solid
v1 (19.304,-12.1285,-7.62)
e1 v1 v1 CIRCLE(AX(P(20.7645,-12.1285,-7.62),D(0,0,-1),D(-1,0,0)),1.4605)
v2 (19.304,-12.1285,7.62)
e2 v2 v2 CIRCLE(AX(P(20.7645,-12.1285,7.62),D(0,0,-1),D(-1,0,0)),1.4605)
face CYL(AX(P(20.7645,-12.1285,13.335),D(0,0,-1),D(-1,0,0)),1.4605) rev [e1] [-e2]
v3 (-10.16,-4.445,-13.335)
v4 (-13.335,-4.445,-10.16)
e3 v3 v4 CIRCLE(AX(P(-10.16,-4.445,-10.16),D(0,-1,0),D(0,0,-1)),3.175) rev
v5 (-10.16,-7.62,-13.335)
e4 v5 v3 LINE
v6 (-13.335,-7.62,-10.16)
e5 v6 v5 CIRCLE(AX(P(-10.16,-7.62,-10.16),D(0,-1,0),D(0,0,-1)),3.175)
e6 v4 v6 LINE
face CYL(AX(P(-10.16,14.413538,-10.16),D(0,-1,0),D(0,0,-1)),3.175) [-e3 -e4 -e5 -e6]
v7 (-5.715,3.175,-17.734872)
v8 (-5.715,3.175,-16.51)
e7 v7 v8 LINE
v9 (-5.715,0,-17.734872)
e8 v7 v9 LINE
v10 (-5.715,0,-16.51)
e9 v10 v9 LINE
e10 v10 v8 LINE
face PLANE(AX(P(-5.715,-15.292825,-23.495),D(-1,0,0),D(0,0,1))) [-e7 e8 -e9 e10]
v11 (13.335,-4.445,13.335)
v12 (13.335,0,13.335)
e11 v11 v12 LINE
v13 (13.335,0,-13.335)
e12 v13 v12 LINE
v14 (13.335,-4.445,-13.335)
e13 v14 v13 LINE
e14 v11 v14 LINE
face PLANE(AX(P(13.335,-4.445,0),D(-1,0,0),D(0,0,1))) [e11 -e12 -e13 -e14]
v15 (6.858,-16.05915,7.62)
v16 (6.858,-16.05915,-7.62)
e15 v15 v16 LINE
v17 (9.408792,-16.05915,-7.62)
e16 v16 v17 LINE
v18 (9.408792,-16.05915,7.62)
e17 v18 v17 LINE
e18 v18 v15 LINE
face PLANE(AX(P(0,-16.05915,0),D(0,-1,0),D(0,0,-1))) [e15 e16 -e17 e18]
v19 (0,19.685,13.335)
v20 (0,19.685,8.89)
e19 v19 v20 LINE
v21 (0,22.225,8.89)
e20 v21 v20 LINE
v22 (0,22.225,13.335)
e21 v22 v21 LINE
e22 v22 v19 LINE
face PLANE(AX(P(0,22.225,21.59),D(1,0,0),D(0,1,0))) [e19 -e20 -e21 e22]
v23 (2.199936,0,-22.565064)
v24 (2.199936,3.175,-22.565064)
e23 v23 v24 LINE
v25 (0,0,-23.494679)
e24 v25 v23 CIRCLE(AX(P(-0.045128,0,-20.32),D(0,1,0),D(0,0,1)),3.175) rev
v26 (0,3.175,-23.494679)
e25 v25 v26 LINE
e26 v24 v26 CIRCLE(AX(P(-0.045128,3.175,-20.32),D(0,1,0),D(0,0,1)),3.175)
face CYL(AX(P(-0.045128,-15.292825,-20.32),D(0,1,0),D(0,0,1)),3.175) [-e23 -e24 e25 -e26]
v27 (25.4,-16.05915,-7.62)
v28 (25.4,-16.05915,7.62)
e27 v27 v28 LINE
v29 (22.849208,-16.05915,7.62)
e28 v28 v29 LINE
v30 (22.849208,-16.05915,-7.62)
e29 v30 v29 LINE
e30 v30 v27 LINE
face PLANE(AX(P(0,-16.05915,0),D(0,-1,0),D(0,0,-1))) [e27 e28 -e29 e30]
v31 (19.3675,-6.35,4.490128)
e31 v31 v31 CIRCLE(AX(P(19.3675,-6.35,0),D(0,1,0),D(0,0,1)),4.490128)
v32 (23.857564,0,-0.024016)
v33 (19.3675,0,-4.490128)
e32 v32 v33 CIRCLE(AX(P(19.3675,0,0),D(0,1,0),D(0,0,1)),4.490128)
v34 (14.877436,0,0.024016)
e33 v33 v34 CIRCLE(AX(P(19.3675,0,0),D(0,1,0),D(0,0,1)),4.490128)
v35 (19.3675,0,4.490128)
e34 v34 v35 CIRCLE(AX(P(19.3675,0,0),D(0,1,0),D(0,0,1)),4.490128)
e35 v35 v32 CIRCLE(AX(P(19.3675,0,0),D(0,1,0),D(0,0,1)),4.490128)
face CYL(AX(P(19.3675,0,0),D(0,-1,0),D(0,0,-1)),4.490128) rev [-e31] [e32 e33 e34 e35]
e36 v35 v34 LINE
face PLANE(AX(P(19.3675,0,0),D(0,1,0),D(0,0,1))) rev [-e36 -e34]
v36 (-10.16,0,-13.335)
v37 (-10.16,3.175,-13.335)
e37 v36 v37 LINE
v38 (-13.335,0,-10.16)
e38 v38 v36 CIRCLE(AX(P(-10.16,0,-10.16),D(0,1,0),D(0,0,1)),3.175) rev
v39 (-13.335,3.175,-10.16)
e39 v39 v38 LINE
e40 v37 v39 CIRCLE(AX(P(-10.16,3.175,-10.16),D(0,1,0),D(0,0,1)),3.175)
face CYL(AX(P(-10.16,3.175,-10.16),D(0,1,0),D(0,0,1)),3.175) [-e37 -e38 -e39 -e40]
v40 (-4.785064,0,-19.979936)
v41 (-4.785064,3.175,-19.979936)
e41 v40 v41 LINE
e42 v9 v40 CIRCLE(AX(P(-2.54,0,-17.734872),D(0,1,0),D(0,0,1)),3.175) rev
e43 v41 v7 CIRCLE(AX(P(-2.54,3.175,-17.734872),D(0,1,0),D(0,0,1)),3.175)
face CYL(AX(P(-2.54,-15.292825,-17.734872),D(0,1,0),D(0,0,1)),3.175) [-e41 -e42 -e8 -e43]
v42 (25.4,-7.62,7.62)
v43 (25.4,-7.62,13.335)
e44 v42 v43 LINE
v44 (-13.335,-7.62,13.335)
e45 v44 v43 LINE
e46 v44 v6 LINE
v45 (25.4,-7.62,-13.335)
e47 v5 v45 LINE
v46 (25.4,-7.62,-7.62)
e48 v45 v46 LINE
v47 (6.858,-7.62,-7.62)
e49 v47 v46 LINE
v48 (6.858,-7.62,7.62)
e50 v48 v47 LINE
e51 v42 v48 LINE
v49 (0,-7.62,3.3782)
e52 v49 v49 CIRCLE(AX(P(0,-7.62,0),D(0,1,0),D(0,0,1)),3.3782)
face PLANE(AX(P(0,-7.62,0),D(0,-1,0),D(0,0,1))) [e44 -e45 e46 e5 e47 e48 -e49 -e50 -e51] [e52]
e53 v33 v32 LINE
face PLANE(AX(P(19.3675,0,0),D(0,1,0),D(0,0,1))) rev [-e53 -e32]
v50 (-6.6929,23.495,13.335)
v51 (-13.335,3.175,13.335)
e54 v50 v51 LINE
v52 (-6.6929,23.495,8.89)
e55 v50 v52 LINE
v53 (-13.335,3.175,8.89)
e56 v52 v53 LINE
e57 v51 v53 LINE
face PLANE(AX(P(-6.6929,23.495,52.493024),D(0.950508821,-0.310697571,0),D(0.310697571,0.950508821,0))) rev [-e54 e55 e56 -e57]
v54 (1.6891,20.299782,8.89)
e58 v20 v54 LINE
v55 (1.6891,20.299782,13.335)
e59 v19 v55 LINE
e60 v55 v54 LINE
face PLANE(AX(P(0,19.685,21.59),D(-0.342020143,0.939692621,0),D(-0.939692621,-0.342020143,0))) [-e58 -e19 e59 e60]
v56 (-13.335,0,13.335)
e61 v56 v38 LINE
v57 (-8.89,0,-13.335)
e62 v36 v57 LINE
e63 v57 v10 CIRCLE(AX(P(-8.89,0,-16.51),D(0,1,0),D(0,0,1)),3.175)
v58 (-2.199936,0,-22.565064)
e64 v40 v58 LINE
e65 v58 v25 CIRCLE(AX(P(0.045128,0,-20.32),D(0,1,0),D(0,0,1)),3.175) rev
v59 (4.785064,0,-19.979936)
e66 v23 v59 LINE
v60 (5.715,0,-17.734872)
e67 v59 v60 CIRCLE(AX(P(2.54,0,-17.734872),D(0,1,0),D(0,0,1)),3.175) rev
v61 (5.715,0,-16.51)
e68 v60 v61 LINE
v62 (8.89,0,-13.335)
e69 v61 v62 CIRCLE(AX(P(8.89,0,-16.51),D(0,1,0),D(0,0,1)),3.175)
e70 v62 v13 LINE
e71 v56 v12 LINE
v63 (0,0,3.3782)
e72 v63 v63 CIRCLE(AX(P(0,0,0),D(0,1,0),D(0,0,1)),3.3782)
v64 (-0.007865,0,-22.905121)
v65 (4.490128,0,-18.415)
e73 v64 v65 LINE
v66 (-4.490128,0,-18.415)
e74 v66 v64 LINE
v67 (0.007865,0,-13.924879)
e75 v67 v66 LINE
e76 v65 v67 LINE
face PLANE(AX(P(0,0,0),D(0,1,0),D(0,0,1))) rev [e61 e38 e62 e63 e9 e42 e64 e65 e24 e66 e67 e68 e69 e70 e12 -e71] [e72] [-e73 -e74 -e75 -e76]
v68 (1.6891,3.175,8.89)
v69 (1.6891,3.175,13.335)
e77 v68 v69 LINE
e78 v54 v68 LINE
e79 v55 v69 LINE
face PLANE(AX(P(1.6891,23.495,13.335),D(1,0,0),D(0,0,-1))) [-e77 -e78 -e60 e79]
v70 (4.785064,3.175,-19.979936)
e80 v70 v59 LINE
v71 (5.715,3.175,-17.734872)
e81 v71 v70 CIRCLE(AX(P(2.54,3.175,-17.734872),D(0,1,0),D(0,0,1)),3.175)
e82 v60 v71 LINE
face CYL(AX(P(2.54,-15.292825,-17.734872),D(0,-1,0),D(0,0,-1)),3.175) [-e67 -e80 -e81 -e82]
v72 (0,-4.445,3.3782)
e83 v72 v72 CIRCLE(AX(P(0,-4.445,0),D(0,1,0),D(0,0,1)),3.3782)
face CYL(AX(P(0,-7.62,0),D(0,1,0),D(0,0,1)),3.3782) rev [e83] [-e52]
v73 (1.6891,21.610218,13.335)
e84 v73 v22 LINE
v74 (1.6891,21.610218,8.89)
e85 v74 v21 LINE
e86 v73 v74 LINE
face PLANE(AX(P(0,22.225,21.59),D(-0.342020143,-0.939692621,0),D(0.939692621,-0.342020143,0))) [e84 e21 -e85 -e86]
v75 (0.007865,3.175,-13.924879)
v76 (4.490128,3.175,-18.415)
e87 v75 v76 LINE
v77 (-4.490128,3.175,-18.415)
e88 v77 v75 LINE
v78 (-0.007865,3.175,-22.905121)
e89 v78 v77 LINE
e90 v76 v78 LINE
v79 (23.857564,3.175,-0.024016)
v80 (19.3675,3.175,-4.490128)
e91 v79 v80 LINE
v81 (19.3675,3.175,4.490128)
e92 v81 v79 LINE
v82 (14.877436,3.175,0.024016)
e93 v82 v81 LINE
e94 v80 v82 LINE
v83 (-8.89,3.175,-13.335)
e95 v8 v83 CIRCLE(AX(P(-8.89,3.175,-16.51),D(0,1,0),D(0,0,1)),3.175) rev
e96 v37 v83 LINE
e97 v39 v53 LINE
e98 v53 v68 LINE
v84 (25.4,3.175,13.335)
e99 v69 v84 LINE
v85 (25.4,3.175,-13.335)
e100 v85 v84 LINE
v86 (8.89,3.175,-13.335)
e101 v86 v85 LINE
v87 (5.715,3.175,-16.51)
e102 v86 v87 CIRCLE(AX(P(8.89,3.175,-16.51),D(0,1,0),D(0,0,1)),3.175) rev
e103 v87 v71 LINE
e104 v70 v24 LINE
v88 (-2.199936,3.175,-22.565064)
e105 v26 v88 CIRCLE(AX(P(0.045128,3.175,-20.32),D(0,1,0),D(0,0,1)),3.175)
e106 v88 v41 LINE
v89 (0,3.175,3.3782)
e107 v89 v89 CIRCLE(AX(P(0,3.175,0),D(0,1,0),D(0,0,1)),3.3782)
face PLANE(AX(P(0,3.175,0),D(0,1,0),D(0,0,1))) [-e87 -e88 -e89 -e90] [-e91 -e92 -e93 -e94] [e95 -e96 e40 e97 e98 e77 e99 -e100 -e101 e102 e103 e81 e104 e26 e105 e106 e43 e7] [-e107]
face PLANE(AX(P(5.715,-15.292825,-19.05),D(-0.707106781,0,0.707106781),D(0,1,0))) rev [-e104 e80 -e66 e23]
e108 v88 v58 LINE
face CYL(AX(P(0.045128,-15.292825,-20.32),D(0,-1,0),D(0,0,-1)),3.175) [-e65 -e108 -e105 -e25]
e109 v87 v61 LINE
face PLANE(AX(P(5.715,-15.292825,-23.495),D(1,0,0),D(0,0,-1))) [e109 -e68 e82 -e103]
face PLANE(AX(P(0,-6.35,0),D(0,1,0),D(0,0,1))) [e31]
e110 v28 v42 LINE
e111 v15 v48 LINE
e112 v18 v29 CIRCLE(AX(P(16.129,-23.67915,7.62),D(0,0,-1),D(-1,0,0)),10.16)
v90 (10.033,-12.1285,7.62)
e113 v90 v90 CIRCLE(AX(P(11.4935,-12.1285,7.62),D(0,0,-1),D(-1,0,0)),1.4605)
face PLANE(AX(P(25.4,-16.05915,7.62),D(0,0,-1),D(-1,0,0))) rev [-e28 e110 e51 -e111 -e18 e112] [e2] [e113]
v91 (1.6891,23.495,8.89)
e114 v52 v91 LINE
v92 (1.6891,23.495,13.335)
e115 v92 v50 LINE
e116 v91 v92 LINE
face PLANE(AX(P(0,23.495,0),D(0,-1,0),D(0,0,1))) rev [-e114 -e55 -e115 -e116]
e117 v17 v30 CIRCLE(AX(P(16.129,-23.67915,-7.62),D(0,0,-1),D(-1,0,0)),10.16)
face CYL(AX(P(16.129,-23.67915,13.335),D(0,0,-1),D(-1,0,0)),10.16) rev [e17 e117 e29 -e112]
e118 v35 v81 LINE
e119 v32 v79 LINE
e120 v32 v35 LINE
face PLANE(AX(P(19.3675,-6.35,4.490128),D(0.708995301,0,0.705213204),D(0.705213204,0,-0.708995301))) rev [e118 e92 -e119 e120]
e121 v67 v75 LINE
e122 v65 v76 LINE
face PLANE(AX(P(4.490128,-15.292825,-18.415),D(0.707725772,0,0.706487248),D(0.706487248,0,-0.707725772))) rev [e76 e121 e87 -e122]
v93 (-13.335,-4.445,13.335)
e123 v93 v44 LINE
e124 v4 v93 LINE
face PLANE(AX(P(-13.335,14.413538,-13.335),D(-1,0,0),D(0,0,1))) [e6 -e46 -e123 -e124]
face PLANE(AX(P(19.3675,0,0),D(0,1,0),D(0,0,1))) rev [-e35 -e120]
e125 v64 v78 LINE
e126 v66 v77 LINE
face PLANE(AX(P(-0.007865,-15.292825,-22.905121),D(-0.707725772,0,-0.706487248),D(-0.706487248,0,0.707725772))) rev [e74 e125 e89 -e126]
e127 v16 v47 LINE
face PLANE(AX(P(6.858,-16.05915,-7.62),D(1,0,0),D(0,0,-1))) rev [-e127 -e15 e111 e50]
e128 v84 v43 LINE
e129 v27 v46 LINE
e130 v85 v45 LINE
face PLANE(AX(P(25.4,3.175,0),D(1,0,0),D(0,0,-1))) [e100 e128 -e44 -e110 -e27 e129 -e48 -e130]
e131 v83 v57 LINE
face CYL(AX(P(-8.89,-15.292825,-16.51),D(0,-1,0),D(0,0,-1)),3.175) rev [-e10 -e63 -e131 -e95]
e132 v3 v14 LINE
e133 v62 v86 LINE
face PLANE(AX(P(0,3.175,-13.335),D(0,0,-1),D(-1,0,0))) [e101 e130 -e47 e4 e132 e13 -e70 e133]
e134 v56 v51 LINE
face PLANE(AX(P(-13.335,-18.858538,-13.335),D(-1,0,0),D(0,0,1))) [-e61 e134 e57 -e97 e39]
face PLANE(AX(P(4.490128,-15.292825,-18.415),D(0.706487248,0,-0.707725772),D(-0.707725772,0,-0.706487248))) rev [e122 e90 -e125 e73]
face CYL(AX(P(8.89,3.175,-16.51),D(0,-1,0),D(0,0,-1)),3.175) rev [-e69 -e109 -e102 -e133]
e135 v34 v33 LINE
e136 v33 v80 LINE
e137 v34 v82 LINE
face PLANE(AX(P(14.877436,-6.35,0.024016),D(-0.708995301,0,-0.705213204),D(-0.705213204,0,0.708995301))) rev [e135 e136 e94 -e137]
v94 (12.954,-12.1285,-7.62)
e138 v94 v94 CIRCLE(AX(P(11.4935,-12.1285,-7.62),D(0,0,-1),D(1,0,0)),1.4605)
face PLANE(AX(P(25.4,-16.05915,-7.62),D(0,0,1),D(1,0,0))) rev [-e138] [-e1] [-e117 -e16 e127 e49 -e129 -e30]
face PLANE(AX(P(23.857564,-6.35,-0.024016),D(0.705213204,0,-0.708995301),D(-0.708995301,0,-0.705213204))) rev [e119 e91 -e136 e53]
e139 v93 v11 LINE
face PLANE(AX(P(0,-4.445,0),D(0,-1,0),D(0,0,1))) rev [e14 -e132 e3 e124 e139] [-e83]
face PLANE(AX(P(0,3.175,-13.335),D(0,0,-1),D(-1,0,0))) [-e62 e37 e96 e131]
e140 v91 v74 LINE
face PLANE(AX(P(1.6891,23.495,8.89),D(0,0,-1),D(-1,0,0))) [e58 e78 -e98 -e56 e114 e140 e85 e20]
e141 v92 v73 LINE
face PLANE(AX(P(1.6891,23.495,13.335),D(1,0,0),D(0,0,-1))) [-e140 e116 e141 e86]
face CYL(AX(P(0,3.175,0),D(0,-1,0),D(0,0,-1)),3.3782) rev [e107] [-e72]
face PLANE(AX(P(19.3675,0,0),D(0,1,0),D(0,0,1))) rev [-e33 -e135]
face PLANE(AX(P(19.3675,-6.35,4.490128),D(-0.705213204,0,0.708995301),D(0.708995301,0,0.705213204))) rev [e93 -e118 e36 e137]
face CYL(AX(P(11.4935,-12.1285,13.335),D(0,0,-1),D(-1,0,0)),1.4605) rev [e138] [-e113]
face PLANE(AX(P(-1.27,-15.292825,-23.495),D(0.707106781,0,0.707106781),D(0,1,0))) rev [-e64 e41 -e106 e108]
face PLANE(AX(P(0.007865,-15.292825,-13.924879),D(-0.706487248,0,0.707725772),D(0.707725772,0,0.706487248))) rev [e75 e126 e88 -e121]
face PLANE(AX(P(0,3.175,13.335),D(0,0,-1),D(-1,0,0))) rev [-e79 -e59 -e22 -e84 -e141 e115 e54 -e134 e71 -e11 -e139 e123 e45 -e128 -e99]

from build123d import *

# Parameters (mm, degrees)
SKETCH1_R            = 3.3782
BOSS_EXTRUDE1_DEPTH  = 3.175
BOSS_EXTRUDE2_DEPTH  = 4.445
SKETCH7_W            = 18.542
SKETCH7_H            = 15.24
BOSS_EXTRUDE4_DEPTH  = 8.43915
SKETCH8_R            = 1.4605
CUT_EXTRUDE3_DEPTH   = 37.635615509
SKETCH9_R            = 10.16
CUT_EXTRUDE4_DEPTH   = 37.635615509
CUT_EXTRUDE6_DEPTH   = 9.525
SKETCH23_R           = 4.490128061
CUT_EXTRUDE7_DEPTH   = 6.35
BOSS_EXTRUDE10_DEPTH = 3.175
BOSS_EXTRUDE11_DEPTH = 3.175
SKETCH19_W           = 8.382
SKETCH19_H           = 4.445
BOSS_EXTRUDE12_DEPTH = 20.32
BOSS_EXTRUDE13_DEPTH = 4.445
CUT_EXTRUDE5_DEPTH   = 12.7
SKETCH24_W           = 48.736365122
SKETCH24_H           = 10.862134757
CUT_EXTRUDE8_DEPTH   = 30.48
SKETCH26_W           = 11.43
SKETCH26_H           = 10.16
BOSS_EXTRUDE15_DEPTH = 3.175
CHAMFER1_SIZE        = 4.445
FILLET1_R            = 3.175


with BuildPart() as part:
    # Sketch1 → Boss-Extrude1 (new body)
    with BuildSketch(Plane(origin=(0, 0, 0), x_dir=(1, 0, 0), z_dir=(0, 1, 0))):
        with BuildLine():
            Line((0, -13.335), (25.4, -13.335))
            Line((25.4, -13.335), (25.4, 13.335))
            Line((25.4, 13.335), (0, 13.335))
            ThreePointArc((0, 13.335), (-13.335, 0), (0, -13.335))
        make_face()
        with Locations(Location((0, 0, 0), (0, 0, 270))):
            Circle(SKETCH1_R, mode=Mode.SUBTRACT)
    boss_extrude1 = extrude(amount=BOSS_EXTRUDE1_DEPTH)

    # Sketch2 → Boss-Extrude2 (add)
    with BuildSketch(Plane(origin=(0, 0, 0), x_dir=(-1, 0, 0), z_dir=(0, -1, 0))):
        Polygon((-25.4, 13.335), (-25.4, -13.335), (-13.335, -13.335), (-13.335, 0), (-13.335, 13.335), align=None)
    extrude(amount=BOSS_EXTRUDE2_DEPTH)

    # Mirror2: Boss-Extrude1 across plane
    add(boss_extrude1.mirror(Plane(origin=(0, -2.2225, 0), x_dir=(0, 0, 1), z_dir=(0, -1, 0))))

    # Sketch7 → Boss-Extrude4 (add)
    with BuildSketch(Plane(origin=(0, -7.62, 0), x_dir=(-1, 0, 0), z_dir=(0, -1, 0))):
        with Locations((-16.129, 0)):
            Rectangle(SKETCH7_W, SKETCH7_H)
    extrude(amount=BOSS_EXTRUDE4_DEPTH)

    # Sketch8 → Cut-Extrude3 (cut, through all)
    with BuildSketch(Plane(origin=(0, 0, -7.62), x_dir=(-1, 0, 0), z_dir=(0, 0, -1))):
        with Locations((-20.7645, -12.1285)):
            Circle(SKETCH8_R)
        with Locations((-11.4935, -12.1285)):
            Circle(SKETCH8_R)
    extrude(amount=-CUT_EXTRUDE3_DEPTH, mode=Mode.SUBTRACT)

    # Sketch9 → Cut-Extrude4 (cut, through all)
    with BuildSketch(Plane(origin=(0, 0, -7.62), x_dir=(-1, 0, 0), z_dir=(0, 0, -1))):
        with Locations((-16.129, -23.67915)):
            Circle(SKETCH9_R)
    extrude(amount=-CUT_EXTRUDE4_DEPTH, mode=Mode.SUBTRACT)

    # Sketch22 → Cut-Extrude6 (cut)
    with BuildSketch(Plane(origin=(0, 3.175, 0), x_dir=(1, 0, 0), z_dir=(0, 1, 0))):
        Polygon((19.3675, -4.490128061), (23.857563833, 0.024016226), (19.3675, 4.490128061), (14.877436167, -0.024016226), align=None)
    extrude(amount=-CUT_EXTRUDE6_DEPTH, mode=Mode.SUBTRACT)

    # Sketch23 → Cut-Extrude7 (cut)
    with BuildSketch(Plane(origin=(0, -6.35, 0), x_dir=(1, 0, 0), z_dir=(0, 1, 0))):
        with Locations(Location((19.3675, 0, 0), (0, 0, 270))):
            Circle(SKETCH23_R)
    extrude(amount=CUT_EXTRUDE7_DEPTH, mode=Mode.SUBTRACT)

    # Sketch16 → Boss-Extrude10 (add)
    with BuildSketch(Plane(origin=(0, 3.175, 0), x_dir=(1, 0, 0), z_dir=(0, 1, 0))):
        Polygon((0, 13.335), (-13.335, 0), (-13.335, 13.335), align=None)
    boss_extrude10 = extrude(amount=-BOSS_EXTRUDE10_DEPTH)

    # Sketch17 → Boss-Extrude11 (add)
    with BuildSketch(Plane.XZ.offset(7.62)):
        Polygon((-13.335, -13.335), (-13.335, 0), (0, -13.335), align=None)
    boss_extrude11 = extrude(amount=-BOSS_EXTRUDE11_DEPTH)

    # Sketch19 → Boss-Extrude12 (add)
    with BuildSketch(Plane(origin=(0, 3.175, 0), x_dir=(1, 0, 0), z_dir=(0, 1, 0))):
        with Locations((-2.5019, 11.1125)):
            Rectangle(SKETCH19_W, SKETCH19_H)
    boss_extrude12 = extrude(amount=BOSS_EXTRUDE12_DEPTH)

    # Sketch20 → Boss-Extrude13 (add)
    with BuildSketch(Plane.XY.offset(-8.89)):
        Polygon((-6.6929, 23.495), (-13.335, 3.175), (-6.6929, 3.175), align=None)
    boss_extrude13 = extrude(amount=-BOSS_EXTRUDE13_DEPTH)

    # Sketch21 → Cut-Extrude5 (cut)
    with BuildSketch(Plane.XY.offset(-8.89)):
        Polygon((0, 22.225), (1.6891, 21.610217877), (1.6891, 20.299782123), (0, 19.685), align=None)
    cut_extrude5 = extrude(amount=-CUT_EXTRUDE5_DEPTH, mode=Mode.SUBTRACT)

    # Mirror3: Boss-Extrude10, Boss-Extrude11, Boss-Extrude12, Boss-Extrude13, Cut-Extrude5 across plane
    add(boss_extrude10.mirror(Plane.XY))
    add(boss_extrude11.mirror(Plane.XY))
    add(boss_extrude12.mirror(Plane.XY))
    add(boss_extrude13.mirror(Plane.XY))
    add(cut_extrude5.mirror(Plane.XY), mode=Mode.SUBTRACT)

    # Sketch24 → Cut-Extrude8 (cut)
    with BuildSketch(Plane(origin=(0, 3.175, 0), x_dir=(1, 0, 0), z_dir=(0, 1, 0))):
        with Locations((2.598122841, 11.203809408)):
            Rectangle(SKETCH24_W, SKETCH24_H)
    extrude(amount=CUT_EXTRUDE8_DEPTH, mode=Mode.SUBTRACT)

    # Sketch26 → Boss-Extrude15 (add)
    with BuildSketch(Plane(origin=(0, 3.175, 0), x_dir=(1, 0, 0), z_dir=(0, 1, 0))):
        with Locations((0, 18.415)):
            Rectangle(SKETCH26_W, SKETCH26_H)
        Polygon((4.490128061, 18.415), (0.007864628, 13.924878827), (-4.490128061, 18.415), (-0.007864628, 22.905121173), align=None, mode=Mode.SUBTRACT)
    extrude(amount=-BOSS_EXTRUDE15_DEPTH)

    # Chamfer1
    chamfer1_edges = [part.edges().sort_by_distance(p)[0] for p in [
        (5.715, 1.5875, -23.495),
        (-5.715, 1.5875, -23.495),
    ]]
    chamfer(chamfer1_edges, length=CHAMFER1_SIZE)

    # Fillet1
    # the kernel refuses this fillet: 3.175 mm, written as the material it adds along each edge
    with BuildSketch(Plane(origin=(-5.715, 3.175, -13.335), x_dir=(0, 0, -1), z_dir=(0, -1, 0))) as fillet1_piece_1:
        with BuildLine():
            CenterArc((FILLET1_R, -FILLET1_R), FILLET1_R, 90, 90)
            Line((0, -FILLET1_R), (0, 0))
            Line((0, 0), (FILLET1_R, 0))
        make_face()
    extrude(amount=3.175)
    with BuildSketch(Plane(origin=(5.715, 3.175, -13.335), x_dir=(0, 0, -1), z_dir=(0, -1, 0))) as fillet1_piece_2:
        with BuildLine():
            CenterArc((FILLET1_R, FILLET1_R), FILLET1_R, 180, 90)
            Line((0, FILLET1_R), (0, 0))
            Line((0, 0), (FILLET1_R, 0))
        make_face()
    extrude(amount=3.175)
    # the kernel refuses this fillet: 3.175 mm, written as the material it takes off along each edge
    with BuildSketch(Plane(origin=(-13.335, 11.1125, -13.335), x_dir=(1, 0, 0), z_dir=(0, -1, 0))) as fillet1_2_piece_1:
        with BuildLine():
            CenterArc((FILLET1_R, FILLET1_R), FILLET1_R, 180, 90)
            Line((0, FILLET1_R), (0, 0))
            Line((0, 0), (FILLET1_R, 0))
        make_face()
    extrude(amount=19.05, mode=Mode.SUBTRACT)
    with BuildSketch(Plane(origin=(-13.335, -15.5575, -13.335), x_dir=(1, 0, 0), z_dir=(0, 1, 0))) as fillet1_2_piece_2:
        with BuildLine():
            CenterArc((FILLET1_R, -FILLET1_R), FILLET1_R, 90, 90)
            Line((0, -FILLET1_R), (0, 0))
            Line((0, 0), (FILLET1_R, 0))
        make_face()
    extrude(amount=19.05, mode=Mode.SUBTRACT)
    with BuildSketch(Plane(origin=(-1.27, 6.462820151, -23.495), x_dir=(1, 0, 0), z_dir=(0, -1, 0)), Plane(origin=(-5.715, 6.462820151, -19.05), x_dir=(0.7071067811865476, 0, -0.7071067811865476), z_dir=(0, -1, 0)), Plane(origin=(1.27, 6.462820151, -23.495), x_dir=(0.7071067811865479, 0, 0.7071067811865472), z_dir=(0, -1, 0)), Plane(origin=(5.715, 6.462820151, -19.05), x_dir=(0, 0, 1), z_dir=(0, -1, 0))) as fillet1_2_piece_3:
        with BuildLine():
            CenterArc((FILLET1_R * 0.414213562373, FILLET1_R), FILLET1_R, 225, 45)
            Line((-FILLET1_R * 0.292893218813, FILLET1_R * 0.292893218813), (0, 0))
            Line((0, 0), (FILLET1_R * 0.414213562373, 0))
        make_face()
    extrude(amount=9.750640303, mode=Mode.SUBTRACT)


solid = part.part
